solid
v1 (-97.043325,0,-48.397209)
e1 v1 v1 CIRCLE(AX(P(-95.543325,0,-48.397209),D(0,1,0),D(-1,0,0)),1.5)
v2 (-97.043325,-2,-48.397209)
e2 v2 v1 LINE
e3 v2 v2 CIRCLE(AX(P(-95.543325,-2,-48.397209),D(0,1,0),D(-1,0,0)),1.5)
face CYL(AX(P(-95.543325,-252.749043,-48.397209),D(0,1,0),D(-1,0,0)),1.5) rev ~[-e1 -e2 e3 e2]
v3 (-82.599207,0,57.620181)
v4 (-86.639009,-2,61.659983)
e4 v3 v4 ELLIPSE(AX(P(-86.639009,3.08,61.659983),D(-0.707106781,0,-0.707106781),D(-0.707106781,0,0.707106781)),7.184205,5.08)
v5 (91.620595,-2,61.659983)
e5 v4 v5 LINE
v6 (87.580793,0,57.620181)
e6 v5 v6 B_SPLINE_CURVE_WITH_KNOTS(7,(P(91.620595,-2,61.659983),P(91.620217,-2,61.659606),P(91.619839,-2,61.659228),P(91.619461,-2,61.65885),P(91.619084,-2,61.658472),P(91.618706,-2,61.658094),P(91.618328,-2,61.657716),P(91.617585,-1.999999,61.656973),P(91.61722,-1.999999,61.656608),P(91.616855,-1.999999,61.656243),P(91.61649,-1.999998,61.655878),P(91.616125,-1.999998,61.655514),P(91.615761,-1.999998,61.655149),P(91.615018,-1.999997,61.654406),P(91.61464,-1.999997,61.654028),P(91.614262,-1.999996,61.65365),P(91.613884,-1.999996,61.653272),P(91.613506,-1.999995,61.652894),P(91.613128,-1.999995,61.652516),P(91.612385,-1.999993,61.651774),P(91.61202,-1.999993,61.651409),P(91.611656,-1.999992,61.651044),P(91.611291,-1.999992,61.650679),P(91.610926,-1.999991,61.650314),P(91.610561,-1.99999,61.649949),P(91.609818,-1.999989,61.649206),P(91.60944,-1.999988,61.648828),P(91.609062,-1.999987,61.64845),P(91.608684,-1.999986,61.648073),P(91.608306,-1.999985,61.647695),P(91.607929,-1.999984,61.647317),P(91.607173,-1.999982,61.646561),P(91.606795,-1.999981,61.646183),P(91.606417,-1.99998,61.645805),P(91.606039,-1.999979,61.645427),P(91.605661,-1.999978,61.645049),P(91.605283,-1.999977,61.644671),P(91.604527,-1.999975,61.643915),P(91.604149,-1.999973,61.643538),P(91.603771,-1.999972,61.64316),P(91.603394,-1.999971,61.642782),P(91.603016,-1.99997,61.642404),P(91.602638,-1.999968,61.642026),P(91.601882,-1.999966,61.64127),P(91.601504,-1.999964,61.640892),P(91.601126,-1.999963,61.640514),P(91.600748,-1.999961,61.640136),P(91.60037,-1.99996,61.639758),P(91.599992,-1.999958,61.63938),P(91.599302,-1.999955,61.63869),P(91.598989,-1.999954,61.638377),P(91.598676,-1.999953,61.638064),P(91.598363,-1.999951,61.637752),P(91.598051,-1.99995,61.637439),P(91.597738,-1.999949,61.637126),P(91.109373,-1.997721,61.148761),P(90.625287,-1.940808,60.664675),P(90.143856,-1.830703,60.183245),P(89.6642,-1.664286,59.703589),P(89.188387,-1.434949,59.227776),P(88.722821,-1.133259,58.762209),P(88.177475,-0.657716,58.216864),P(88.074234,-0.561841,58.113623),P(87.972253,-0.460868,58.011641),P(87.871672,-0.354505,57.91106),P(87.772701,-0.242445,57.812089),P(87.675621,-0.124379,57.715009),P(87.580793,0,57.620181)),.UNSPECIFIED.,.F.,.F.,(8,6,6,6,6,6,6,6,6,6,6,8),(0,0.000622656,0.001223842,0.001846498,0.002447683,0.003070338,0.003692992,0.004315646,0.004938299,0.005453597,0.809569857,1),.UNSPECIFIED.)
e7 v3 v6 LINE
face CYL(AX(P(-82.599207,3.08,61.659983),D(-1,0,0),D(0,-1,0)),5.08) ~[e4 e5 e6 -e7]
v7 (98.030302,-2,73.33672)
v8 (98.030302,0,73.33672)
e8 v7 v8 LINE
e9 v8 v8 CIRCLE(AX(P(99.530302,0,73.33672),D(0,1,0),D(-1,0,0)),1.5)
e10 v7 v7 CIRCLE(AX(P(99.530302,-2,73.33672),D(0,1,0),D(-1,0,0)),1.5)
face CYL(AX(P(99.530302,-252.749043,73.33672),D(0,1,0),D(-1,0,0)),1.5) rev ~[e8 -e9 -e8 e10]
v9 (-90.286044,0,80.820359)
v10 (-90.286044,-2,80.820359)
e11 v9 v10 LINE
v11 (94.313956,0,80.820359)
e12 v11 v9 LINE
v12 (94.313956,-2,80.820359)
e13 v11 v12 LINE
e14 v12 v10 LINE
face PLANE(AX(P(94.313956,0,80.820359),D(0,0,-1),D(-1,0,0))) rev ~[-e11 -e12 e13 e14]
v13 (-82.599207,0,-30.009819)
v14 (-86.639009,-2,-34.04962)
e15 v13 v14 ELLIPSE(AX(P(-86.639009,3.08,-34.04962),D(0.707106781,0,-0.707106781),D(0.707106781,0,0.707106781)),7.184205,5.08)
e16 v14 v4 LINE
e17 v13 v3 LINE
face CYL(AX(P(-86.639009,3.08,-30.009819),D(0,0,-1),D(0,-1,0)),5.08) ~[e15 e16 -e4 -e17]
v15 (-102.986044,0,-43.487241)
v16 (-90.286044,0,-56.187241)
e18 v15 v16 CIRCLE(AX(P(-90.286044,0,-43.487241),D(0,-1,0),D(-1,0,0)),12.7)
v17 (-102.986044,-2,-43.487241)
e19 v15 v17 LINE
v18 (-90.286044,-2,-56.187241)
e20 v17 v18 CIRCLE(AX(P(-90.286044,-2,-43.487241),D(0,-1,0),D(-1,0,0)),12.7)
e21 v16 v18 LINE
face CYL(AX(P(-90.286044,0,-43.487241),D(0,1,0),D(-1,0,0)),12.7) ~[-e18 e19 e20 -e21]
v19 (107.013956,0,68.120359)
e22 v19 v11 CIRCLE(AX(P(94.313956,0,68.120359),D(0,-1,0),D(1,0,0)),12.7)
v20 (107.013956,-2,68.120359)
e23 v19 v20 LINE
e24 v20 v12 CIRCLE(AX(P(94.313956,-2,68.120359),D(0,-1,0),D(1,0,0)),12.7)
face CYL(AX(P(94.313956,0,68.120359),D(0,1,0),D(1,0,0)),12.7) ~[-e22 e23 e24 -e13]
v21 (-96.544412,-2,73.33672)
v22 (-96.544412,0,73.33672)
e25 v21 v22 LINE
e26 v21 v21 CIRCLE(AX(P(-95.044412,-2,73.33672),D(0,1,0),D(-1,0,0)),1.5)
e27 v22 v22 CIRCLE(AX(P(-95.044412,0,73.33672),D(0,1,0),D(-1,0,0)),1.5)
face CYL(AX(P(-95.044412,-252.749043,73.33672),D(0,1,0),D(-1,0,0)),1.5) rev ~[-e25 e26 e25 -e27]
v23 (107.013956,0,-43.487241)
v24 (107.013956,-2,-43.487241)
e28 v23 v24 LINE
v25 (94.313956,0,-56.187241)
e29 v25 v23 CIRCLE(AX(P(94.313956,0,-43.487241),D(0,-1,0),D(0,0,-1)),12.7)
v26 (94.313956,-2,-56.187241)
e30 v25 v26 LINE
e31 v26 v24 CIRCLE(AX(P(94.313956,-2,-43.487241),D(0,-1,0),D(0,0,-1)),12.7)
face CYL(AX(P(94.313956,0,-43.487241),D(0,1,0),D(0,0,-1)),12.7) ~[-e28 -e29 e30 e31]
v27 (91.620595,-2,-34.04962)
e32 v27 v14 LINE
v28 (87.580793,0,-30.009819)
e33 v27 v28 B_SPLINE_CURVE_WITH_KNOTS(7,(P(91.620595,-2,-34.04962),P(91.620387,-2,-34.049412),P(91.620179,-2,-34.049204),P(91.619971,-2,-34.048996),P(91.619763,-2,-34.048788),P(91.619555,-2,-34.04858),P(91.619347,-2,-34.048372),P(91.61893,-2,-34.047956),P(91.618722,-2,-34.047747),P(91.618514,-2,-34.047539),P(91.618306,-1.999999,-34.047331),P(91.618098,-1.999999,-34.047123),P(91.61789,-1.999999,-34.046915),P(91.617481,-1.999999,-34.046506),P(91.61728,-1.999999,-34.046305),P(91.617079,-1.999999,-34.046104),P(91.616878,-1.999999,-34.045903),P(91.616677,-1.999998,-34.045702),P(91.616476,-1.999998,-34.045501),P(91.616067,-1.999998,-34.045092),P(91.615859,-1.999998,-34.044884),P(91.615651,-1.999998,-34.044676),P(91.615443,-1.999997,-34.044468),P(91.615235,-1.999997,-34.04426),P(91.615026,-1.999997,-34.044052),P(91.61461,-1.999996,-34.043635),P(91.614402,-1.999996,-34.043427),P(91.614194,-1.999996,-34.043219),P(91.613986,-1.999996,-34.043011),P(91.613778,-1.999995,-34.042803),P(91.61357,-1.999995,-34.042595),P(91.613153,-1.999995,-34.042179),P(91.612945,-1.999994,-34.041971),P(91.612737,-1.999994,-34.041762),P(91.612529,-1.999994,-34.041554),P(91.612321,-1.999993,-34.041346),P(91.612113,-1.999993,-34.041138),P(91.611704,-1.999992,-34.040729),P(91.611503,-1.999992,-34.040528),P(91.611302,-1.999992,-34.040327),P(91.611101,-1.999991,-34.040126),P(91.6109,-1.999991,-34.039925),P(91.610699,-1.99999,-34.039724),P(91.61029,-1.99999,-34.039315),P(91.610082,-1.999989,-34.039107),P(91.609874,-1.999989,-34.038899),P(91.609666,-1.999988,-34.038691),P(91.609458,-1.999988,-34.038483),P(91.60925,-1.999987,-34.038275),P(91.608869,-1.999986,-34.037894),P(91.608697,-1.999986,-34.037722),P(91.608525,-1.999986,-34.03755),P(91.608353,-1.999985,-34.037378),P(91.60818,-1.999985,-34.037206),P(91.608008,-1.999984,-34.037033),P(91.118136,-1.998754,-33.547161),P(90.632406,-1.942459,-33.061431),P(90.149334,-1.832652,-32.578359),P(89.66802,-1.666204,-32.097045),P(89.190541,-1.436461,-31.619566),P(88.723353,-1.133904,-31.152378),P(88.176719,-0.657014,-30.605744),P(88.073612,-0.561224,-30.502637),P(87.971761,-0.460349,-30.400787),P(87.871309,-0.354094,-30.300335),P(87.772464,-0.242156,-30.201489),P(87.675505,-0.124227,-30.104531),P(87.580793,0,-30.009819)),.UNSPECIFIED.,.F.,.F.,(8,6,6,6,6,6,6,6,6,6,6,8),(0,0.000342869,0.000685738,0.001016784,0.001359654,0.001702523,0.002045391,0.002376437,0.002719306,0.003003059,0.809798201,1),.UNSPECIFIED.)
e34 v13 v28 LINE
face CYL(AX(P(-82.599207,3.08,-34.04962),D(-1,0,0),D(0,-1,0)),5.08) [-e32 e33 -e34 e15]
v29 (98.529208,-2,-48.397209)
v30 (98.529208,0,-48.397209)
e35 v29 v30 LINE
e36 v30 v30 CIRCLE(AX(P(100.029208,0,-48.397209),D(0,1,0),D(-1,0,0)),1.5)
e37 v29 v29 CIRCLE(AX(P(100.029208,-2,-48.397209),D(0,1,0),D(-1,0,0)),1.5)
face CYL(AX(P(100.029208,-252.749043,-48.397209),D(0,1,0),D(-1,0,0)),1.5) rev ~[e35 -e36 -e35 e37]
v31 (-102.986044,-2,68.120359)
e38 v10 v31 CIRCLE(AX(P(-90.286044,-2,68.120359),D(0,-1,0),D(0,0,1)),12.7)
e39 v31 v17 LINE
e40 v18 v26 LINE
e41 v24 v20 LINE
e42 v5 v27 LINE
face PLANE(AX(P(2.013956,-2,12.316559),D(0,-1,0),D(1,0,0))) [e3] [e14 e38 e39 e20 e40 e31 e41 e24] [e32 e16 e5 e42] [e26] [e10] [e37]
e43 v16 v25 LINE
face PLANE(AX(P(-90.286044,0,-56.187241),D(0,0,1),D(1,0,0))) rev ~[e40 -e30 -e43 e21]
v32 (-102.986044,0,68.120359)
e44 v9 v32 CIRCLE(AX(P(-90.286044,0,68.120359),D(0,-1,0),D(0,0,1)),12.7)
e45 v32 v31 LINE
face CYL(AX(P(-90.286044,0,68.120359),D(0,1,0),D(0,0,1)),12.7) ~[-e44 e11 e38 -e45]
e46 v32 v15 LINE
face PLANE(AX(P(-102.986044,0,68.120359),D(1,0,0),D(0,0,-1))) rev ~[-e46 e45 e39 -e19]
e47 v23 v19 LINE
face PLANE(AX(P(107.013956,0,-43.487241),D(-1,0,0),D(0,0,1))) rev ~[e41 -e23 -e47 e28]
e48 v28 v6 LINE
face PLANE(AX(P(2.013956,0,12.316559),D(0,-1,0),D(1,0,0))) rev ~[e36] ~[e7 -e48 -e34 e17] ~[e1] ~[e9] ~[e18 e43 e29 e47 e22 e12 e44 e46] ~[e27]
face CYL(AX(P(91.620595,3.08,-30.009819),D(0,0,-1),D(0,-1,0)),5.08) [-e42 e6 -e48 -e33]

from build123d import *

# Parameters (mm, degrees)
F0_W         = 170.18
F0_H         = 87.63
F1_DEPTH     = 2
F3_D         = 3
F4_T1_DEPTH  = 87.63
F4_T3_DEPTH  = 170.18
F4_T9_DEPTH  = 97.7295049384
F4_T13_DEPTH = 180.2795049384
F4_T20_DEPTH = 97.7295049384
F4_T24_DEPTH = 180.2795049384
F4_T31_DEPTH = 180.2795049384
F4_T35_DEPTH = 97.7295049384
F4_T42_DEPTH = 180.2795049384
F4_T46_DEPTH = 97.7295049384


# Not quite as in the source:
# - a fillet or chamfer that OpenCascade refuses, or shapes differently, is made with other operations: its cross-section is extruded or revolved along the edge and cut away or added


with BuildPart() as f1:
    # F0 (on Front) → F1 (new body)
    with BuildSketch(Plane.XZ):
        with BuildLine():
            Line((94.3139557123, 80.8203592896), (-90.2860442877, 80.8203592896))
            ThreePointArc((-90.2860442877, 80.8203592896), (-99.2663004088, 77.1006154107), (-102.9860442877, 68.1203592896))
            Line((-102.9860442877, 68.1203592896), (-102.9860442877, -43.4872407104))
            ThreePointArc((-102.9860442877, -43.4872407104), (-99.2663004088, -52.4674968314), (-90.2860442877, -56.1872407104))
            Line((-90.2860442877, -56.1872407104), (94.3139557123, -56.1872407104))
            ThreePointArc((94.3139557123, -56.1872407104), (103.2942118334, -52.4674968314), (107.0139557123, -43.4872407104))
            Line((107.0139557123, -43.4872407104), (107.0139557123, 68.1203592896))
            ThreePointArc((107.0139557123, 68.1203592896), (103.2942118334, 77.1006154107), (94.3139557123, 80.8203592896))
        make_face()
        with Locations((2.4907932702, 13.8051814874)):
            Rectangle(F0_W, F0_H, mode=Mode.SUBTRACT)
    extrude(amount=F1_DEPTH)

    # F3 (through all)
    with Locations(Plane.XZ.offset(2)):
        with Locations((-95.5433249474, -48.3972094953), (-95.0444117188, 73.3367204666), (100.0292077661, -48.3972094953), (99.5303019881, 73.3367204666)):
            Hole(F3_D / 2)

    # F4: fillet of radius 5.08 on 4 edges, made by hand

    # F4_s2 → F4_t1 (cut)
    with BuildSketch(Plane.XY.offset(-30.0098185126)):
        with BuildLine():
            ThreePointArc((91.6205952456, -2), (89.3667097117, -1.4726256161), (87.5807932702, 0))
            Line((87.5807932702, 0), (87.5807932702, -2))
            Line((87.5807932702, -2), (91.6205952456, -2))
        make_face()
        with BuildLine():
            ThreePointArc((-86.6390087051, -2), (-84.3851231712, -1.4726256161), (-82.5992067298, 0))
            Line((-82.5992067298, 0), (-82.5992067298, -2))
            Line((-82.5992067298, -2), (-86.6390087051, -2))
        make_face()
    extrude(amount=F4_T1_DEPTH, mode=Mode.SUBTRACT)

    # F4_s4 → F4_t3 (cut)
    with BuildSketch(Plane.YZ.offset(-82.5992067298)):
        with BuildLine():
            ThreePointArc((-2, 61.6599834627), (-1.4726256161, 59.4060979288), (0, 57.6201814874))
            Line((0, 57.6201814874), (-2, 57.6201814874))
            Line((-2, 57.6201814874), (-2, 61.6599834627))
        make_face()
        with BuildLine():
            ThreePointArc((-2, -34.049620488), (-1.4726256161, -31.795734954), (0, -30.0098185126))
            Line((0, -30.0098185126), (-2, -30.0098185126))
            Line((-2, -30.0098185126), (-2, -34.049620488))
        make_face()
    extrude(amount=F4_T3_DEPTH, mode=Mode.SUBTRACT)


with BuildPart() as f4_tool7:
    # F4_s8 → F4_t9 (new body)
    with BuildSketch(Plane.XY.offset(67.7196864257)):
        with BuildLine():
            ThreePointArc((91.6205952456, -2), (89.3667097117, -1.4726256161), (87.5807932702, 0))
            Line((87.5807932702, 0), (87.5807932702, -2))
            Line((87.5807932702, -2), (91.6205952456, -2))
        make_face()
    extrude(amount=-F4_T9_DEPTH)

    split(bisect_by=Plane.XY.offset(57.6201814874), keep=Keep.TOP)


with BuildPart() as f4_tool11:
    # F4_s12 → F4_t13 (new body)
    with BuildSketch(Plane.YZ.offset(-82.5992067298)):
        with BuildLine():
            ThreePointArc((-2, 61.6599834627), (-1.4726256161, 59.4060979288), (0, 57.6201814874))
            Line((0, 57.6201814874), (-2, 57.6201814874))
            Line((-2, 57.6201814874), (-2, 61.6599834627))
        make_face()
    extrude(amount=F4_T13_DEPTH)

    split(bisect_by=Plane.YZ.offset(87.5807932702), keep=Keep.TOP)


with BuildPart() as f4_tool7_1:
    add(f4_tool7.part)

    # F4_t15: intersect F4_tool11
    add(f4_tool11.part, mode=Mode.INTERSECT)


with BuildPart() as f1_1:
    add(f1.part)

    # F4_t5: cut F4_tool7
    add(f4_tool7_1.part, mode=Mode.SUBTRACT)


with BuildPart() as f4_tool18:
    # F4_s19 → F4_t20 (new body)
    with BuildSketch(Plane.XY.offset(57.6201814874)):
        with BuildLine():
            ThreePointArc((91.6205952456, -2), (89.3667097117, -1.4726256161), (87.5807932702, 0))
            Line((87.5807932702, 0), (87.5807932702, -2))
            Line((87.5807932702, -2), (91.6205952456, -2))
        make_face()
    extrude(amount=-F4_T20_DEPTH)

    split(bisect_by=Plane.XY.offset(-30.0098185126), keep=Keep.BOTTOM)


with BuildPart() as f4_tool22:
    # F4_s23 → F4_t24 (new body)
    with BuildSketch(Plane.YZ.offset(97.6802982086)):
        with BuildLine():
            ThreePointArc((-2, -34.049620488), (-1.4726256161, -31.795734954), (0, -30.0098185126))
            Line((0, -30.0098185126), (-2, -30.0098185126))
            Line((-2, -30.0098185126), (-2, -34.049620488))
        make_face()
    extrude(amount=-F4_T24_DEPTH)

    split(bisect_by=Plane.YZ.offset(87.5807932702), keep=Keep.TOP)


with BuildPart() as f4_tool18_1:
    add(f4_tool18.part)

    # F4_t26: intersect F4_tool22
    add(f4_tool22.part, mode=Mode.INTERSECT)


with BuildPart() as f1_2:
    add(f1_1.part)

    # F4_t16: cut F4_tool18
    add(f4_tool18_1.part, mode=Mode.SUBTRACT)


with BuildPart() as f4_tool29:
    # F4_s30 → F4_t31 (new body)
    with BuildSketch(Plane.YZ.offset(-92.6987116681)):
        with BuildLine():
            ThreePointArc((-2, 61.6599834627), (-1.4726256161, 59.4060979288), (0, 57.6201814874))
            Line((0, 57.6201814874), (-2, 57.6201814874))
            Line((-2, 57.6201814874), (-2, 61.6599834627))
        make_face()
    extrude(amount=F4_T31_DEPTH)

    split(bisect_by=Plane.YZ.offset(-82.5992067298), keep=Keep.BOTTOM)


with BuildPart() as f4_tool33:
    # F4_s34 → F4_t35 (new body)
    with BuildSketch(Plane.XY.offset(-30.0098185126)):
        with BuildLine():
            ThreePointArc((-86.6390087051, -2), (-84.3851231712, -1.4726256161), (-82.5992067298, 0))
            Line((-82.5992067298, 0), (-82.5992067298, -2))
            Line((-82.5992067298, -2), (-86.6390087051, -2))
        make_face()
    extrude(amount=F4_T35_DEPTH)

    split(bisect_by=Plane.XY.offset(57.6201814874), keep=Keep.TOP)


with BuildPart() as f4_tool29_1:
    add(f4_tool29.part)

    # F4_t37: intersect F4_tool33
    add(f4_tool33.part, mode=Mode.INTERSECT)


with BuildPart() as f1_3:
    add(f1_2.part)

    # F4_t27: cut F4_tool29
    add(f4_tool29_1.part, mode=Mode.SUBTRACT)


with BuildPart() as f4_tool40:
    # F4_s41 → F4_t42 (new body)
    with BuildSketch(Plane.YZ.offset(87.5807932702)):
        with BuildLine():
            ThreePointArc((-2, -34.049620488), (-1.4726256161, -31.795734954), (0, -30.0098185126))
            Line((0, -30.0098185126), (-2, -30.0098185126))
            Line((-2, -30.0098185126), (-2, -34.049620488))
        make_face()
    extrude(amount=-F4_T42_DEPTH)

    split(bisect_by=Plane.YZ.offset(-82.5992067298), keep=Keep.BOTTOM)


with BuildPart() as f4_tool44:
    # F4_s45 → F4_t46 (new body)
    with BuildSketch(Plane.XY.offset(-40.109323451)):
        with BuildLine():
            ThreePointArc((-86.6390087051, -2), (-84.3851231712, -1.4726256161), (-82.5992067298, 0))
            Line((-82.5992067298, 0), (-82.5992067298, -2))
            Line((-82.5992067298, -2), (-86.6390087051, -2))
        make_face()
    extrude(amount=F4_T46_DEPTH)

    split(bisect_by=Plane.XY.offset(-30.0098185126), keep=Keep.BOTTOM)


with BuildPart() as f4_tool40_1:
    add(f4_tool40.part)

    # F4_t48: intersect F4_tool44
    add(f4_tool44.part, mode=Mode.INTERSECT)


with BuildPart() as f1_4:
    add(f1_3.part)

    # F4_t38: cut F4_tool40
    add(f4_tool40_1.part, mode=Mode.SUBTRACT)


solid = f1_4.part
